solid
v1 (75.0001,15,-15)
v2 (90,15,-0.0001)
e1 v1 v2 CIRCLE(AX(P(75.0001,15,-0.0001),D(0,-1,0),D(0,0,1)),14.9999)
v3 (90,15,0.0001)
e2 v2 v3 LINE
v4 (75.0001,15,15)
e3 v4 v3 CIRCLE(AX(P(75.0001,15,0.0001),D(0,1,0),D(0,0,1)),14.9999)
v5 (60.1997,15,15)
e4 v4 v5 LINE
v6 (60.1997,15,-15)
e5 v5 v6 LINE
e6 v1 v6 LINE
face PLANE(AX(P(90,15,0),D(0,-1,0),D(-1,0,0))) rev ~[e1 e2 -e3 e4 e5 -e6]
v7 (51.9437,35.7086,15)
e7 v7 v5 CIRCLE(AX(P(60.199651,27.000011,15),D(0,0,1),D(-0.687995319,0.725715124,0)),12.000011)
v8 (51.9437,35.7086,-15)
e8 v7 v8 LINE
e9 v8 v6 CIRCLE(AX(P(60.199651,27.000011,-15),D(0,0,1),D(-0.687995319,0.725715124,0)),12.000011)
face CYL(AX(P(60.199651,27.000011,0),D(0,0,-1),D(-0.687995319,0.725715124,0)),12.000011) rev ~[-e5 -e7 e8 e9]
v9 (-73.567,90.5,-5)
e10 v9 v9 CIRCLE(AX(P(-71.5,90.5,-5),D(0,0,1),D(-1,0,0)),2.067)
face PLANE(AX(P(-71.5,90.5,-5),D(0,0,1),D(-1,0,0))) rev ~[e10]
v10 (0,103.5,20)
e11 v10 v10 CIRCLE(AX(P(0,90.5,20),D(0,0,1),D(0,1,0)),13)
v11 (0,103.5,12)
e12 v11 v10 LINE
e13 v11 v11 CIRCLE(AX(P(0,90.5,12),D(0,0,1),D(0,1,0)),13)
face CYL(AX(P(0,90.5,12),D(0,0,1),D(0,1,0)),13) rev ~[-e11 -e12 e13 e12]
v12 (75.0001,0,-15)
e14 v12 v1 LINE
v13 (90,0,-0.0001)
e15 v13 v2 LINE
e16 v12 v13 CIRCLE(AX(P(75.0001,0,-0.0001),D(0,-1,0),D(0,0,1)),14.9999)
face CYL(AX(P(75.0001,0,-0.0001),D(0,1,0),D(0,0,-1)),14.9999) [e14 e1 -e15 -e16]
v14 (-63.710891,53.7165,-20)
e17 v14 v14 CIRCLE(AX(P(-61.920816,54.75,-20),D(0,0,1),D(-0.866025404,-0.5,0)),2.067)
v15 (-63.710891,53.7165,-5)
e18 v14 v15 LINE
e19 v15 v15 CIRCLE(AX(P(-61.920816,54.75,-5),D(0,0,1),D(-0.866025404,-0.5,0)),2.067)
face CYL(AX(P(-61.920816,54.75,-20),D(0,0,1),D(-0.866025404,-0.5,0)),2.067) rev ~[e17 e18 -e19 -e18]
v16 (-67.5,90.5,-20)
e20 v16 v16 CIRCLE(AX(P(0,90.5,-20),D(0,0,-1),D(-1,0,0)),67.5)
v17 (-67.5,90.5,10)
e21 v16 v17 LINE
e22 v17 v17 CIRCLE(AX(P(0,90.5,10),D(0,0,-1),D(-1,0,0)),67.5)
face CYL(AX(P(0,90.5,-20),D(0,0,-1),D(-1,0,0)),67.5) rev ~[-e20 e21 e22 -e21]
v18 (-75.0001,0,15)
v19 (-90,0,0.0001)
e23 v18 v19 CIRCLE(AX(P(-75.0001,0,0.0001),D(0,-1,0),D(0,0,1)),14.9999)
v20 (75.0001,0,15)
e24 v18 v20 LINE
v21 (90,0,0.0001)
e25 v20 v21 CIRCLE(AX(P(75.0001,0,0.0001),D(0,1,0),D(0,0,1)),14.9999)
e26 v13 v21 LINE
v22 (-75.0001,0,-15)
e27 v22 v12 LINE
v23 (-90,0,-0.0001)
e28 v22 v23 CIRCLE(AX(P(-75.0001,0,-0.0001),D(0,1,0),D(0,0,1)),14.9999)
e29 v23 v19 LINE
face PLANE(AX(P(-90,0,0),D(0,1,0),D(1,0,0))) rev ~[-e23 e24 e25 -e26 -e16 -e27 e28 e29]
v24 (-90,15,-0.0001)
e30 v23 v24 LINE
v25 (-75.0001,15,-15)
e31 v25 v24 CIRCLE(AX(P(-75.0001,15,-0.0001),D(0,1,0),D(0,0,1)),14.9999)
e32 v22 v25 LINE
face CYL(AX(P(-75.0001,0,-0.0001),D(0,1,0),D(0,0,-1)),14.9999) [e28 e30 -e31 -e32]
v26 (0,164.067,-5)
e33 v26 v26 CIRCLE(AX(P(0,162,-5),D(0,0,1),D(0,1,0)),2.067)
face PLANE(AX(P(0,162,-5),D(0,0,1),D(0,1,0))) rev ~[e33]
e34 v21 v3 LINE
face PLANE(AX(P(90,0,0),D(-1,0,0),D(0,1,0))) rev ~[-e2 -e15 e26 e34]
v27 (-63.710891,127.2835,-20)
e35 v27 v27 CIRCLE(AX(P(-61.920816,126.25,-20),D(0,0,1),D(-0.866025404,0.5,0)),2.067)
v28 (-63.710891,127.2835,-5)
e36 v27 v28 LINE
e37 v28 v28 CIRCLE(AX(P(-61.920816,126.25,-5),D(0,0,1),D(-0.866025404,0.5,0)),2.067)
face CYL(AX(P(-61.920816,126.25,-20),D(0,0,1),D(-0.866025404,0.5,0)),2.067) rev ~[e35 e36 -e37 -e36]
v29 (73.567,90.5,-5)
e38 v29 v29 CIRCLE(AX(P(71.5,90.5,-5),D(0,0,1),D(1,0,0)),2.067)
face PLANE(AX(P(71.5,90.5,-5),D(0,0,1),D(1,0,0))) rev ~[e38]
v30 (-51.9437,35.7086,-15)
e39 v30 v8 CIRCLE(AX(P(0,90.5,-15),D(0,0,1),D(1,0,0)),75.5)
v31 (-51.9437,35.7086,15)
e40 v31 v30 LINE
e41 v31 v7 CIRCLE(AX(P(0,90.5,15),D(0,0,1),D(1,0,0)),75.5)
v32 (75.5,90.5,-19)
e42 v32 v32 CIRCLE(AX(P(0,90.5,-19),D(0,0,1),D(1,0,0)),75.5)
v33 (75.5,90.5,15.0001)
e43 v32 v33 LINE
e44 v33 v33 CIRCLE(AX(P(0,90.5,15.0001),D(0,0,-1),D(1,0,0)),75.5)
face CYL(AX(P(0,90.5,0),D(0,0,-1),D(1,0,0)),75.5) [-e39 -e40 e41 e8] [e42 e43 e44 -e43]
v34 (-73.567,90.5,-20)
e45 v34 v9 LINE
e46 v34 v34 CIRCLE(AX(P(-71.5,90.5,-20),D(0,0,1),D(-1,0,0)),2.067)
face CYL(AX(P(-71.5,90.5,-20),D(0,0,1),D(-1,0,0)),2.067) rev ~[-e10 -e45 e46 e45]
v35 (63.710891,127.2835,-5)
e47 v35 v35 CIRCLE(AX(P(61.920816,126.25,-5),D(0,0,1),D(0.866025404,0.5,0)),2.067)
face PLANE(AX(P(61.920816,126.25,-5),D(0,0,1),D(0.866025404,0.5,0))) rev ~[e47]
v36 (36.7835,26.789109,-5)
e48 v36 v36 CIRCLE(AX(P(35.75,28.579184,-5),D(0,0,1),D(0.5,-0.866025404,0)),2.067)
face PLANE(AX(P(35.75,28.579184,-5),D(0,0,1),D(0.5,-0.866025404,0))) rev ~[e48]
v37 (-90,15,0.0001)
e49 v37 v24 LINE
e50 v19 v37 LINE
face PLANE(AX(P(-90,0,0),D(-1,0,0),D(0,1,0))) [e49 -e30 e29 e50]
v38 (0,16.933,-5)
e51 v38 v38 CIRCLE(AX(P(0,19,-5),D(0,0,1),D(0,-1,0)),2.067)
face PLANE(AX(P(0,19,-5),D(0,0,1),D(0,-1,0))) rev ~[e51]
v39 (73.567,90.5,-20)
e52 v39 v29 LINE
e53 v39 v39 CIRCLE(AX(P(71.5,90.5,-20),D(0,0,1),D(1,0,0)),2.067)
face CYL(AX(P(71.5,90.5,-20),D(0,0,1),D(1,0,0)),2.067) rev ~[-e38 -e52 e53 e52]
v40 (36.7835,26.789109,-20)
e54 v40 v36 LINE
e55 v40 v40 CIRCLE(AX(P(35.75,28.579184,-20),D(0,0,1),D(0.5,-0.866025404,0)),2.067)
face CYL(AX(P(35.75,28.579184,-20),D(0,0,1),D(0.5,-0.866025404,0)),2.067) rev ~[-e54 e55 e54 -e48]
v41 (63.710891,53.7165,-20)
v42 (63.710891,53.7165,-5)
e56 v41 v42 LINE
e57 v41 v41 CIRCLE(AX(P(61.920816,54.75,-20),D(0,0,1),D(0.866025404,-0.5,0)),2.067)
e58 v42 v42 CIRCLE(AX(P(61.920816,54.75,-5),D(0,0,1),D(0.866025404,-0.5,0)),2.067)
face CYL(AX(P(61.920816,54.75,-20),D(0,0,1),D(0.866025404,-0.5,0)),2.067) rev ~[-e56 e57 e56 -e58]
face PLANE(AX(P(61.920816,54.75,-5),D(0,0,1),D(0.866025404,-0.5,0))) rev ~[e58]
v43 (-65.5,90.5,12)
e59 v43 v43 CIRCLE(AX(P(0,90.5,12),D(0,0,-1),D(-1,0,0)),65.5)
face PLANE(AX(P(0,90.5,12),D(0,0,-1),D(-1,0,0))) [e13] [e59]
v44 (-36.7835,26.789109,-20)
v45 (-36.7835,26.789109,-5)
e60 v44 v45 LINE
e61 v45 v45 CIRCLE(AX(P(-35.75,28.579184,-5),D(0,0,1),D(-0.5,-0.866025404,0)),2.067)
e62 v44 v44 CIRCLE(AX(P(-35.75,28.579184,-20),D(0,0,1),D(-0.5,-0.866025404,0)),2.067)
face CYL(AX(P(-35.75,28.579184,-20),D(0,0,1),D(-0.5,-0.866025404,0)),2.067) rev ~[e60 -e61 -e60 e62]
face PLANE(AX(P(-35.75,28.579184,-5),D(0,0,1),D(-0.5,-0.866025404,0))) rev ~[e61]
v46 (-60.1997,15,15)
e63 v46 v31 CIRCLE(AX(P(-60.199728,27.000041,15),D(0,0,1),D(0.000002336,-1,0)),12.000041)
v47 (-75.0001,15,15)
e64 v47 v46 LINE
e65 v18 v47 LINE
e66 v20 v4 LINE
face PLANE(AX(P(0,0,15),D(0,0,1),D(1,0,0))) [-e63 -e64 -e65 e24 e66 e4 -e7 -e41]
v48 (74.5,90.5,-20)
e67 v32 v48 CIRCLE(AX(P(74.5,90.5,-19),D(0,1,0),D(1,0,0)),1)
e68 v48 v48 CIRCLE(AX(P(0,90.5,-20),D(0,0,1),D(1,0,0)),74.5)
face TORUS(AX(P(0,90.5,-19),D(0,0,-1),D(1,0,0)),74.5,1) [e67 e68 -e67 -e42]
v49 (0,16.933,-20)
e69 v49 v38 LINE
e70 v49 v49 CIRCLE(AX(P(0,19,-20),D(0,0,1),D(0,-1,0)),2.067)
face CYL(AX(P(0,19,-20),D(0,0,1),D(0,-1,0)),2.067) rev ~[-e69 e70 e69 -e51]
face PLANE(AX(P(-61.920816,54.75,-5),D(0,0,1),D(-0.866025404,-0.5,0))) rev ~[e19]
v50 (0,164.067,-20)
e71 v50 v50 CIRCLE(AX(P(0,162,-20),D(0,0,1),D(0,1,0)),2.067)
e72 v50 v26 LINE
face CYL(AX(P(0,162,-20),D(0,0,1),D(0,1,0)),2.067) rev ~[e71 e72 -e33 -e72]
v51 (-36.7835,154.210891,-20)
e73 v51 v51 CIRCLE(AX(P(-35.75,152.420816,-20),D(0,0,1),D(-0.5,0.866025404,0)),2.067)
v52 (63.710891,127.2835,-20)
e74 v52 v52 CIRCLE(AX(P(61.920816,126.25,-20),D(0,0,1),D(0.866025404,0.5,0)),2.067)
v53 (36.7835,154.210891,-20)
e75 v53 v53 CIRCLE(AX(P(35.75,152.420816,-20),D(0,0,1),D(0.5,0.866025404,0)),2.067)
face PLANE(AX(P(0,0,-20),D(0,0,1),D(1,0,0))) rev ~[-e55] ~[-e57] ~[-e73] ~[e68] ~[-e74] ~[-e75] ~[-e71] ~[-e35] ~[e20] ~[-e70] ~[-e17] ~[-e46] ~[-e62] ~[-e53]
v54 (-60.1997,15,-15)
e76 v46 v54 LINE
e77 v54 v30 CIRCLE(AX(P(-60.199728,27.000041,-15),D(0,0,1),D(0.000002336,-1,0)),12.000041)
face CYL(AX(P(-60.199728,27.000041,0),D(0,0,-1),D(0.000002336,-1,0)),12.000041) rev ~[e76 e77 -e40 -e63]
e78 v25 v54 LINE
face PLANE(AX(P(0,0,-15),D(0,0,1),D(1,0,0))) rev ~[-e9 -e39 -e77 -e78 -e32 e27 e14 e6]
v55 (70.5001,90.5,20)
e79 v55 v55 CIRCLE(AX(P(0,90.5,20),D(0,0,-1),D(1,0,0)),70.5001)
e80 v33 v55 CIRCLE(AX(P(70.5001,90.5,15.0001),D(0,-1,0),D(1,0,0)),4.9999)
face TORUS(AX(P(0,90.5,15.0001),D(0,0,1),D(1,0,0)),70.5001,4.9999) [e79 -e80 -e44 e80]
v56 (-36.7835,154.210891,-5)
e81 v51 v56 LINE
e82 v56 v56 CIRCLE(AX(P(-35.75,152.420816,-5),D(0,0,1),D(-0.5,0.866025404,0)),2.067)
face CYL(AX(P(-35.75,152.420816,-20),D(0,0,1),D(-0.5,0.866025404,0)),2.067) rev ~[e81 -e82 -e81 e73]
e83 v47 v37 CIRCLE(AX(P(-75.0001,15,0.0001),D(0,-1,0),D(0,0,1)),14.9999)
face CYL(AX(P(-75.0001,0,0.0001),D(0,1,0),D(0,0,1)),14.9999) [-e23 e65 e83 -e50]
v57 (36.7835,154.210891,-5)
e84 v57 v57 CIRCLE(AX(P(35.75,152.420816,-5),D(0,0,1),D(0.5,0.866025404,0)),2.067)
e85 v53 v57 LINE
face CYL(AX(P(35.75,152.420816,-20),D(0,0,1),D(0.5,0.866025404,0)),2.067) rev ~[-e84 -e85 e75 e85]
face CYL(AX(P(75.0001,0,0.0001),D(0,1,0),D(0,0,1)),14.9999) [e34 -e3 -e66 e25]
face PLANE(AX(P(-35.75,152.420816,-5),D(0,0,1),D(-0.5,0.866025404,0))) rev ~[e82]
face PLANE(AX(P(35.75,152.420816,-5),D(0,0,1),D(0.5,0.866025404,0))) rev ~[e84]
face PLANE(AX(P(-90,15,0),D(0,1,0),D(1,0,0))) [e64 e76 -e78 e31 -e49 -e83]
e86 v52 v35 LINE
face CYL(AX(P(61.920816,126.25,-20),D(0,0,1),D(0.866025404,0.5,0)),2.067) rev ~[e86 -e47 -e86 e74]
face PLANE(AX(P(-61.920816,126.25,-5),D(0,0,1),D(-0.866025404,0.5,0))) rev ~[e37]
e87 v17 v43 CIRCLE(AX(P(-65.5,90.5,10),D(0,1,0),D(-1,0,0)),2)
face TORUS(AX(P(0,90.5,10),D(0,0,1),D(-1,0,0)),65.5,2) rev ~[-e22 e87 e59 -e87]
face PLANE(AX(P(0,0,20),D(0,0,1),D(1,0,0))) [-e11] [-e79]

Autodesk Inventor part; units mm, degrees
ref_plane "YZ Plane" through (0, 0, 0) normal (1, 0, 0) x (0, 1, 0)
ref_plane "XZ Plane" through (0, 0, 0) normal (0, 1, 0) x (-1, 0, 0)
ref_plane "XY Plane" through (0, 0, 0) normal (0, 0, 1) x (1, 0, 0)
sketch "Sketch1" plane through (0, 0, 0) normal (0, 0, 1) x (1, 0, 0)
  line L0 (-90, 0) -> (90, 0)
  line L1 (90, 0) -> (90, 15)
  line L2 (90, 15) -> (60.1997, 15)
  arc A0 (51.9437, 35.7086) -> (60.1997, 15) centre (60.1997, 27) ccw
  circle A1 centre (0, 90.5) radius 75.5
  line L3 (-90, 0) -> (-90, 15)
  line L4 (-90, 15) -> (-60.1997, 15)
  arc A2 (-60.1997, 15) -> (-51.9437, 35.7086) centre (-60.1997, 27) ccw
  point P0 (0, 0)
  point P1 (0, 0)
  dimension "d3" = 151
  dimension "d0" = 15
  dimension "d1" = 12
  dimension "d2" = 90.5
  dimension "d4" = 180
extrude "Extrusion1" add sketch "Sketch1" along normal mid plane 30 contours L3 L4 A2 A1 A0 L2 L1 L0
extrude "Extrusion2" add sketch "Sketch1" along normal mid plane 40 contours A1
sketch "Sketch2" plane through (0, 90.5, -20) normal (0, 0, -1) x (-1, 0, 0)
  circle A0 centre (0, 0) radius 67.5
  point P0 (0, -90.5)
  dimension "d9" = 135
extrude "Extrusion3" cut sketch "Sketch2" against normal blind 32
fillet "Fillet1" radius 2 1 edges at (67.5, 90.5, 12)
sketch "Sketch3" plane through (0, 90.5, 12) normal (0, 0, -1) x (-1, 0, 0)
  line L0 (-90, -90.5) -> (90, -90.5) projected
  point P0 (0, -90.5)
  point P1 (0, 0)
  point P2 (0, -90.5)
  dimension "d20" = 90.5
hole "Hole1" at (0, 90.5, 12) direction (0, 0, 1) diameter 26 end through all
fillet "Fillet3" radius 15 4 edges at (-90, 7.5, -15) (-90, 7.5, 15) (90, 7.5, -15) (90, 7.5, 15)
fillet "Fillet4" radius 5 1 edges at (-75.5, 90.5, 20)
fillet "Fillet5" radius 1 1 edges at (-75.5, 90.5, -20)
sketch "Sketch6" plane through (0, 90.5, -20) normal (0, 0, -1) x (-1, 0, 0)
  circle A0 centre (0, 0) radius 71.5 construction
  circle A1 centre (0, 0) radius 13 projected
  point P0 (0, -90.5)
  point P1 (0, 71.5)
  dimension "d43" = 143
hole "Hole4" at (0, 162, -20) direction (0, 0, 1) diameter 4.134 depth 15 thread size "M5x0.8" class "6H" standard "ISO Metric profile"
pattern_circular "Circular Pattern2" count 12 over 360 about axis through (0, 90.5, -20) along (0, 0, 1) of "Hole4"
properties part number "101 part 2" material "Silver"
